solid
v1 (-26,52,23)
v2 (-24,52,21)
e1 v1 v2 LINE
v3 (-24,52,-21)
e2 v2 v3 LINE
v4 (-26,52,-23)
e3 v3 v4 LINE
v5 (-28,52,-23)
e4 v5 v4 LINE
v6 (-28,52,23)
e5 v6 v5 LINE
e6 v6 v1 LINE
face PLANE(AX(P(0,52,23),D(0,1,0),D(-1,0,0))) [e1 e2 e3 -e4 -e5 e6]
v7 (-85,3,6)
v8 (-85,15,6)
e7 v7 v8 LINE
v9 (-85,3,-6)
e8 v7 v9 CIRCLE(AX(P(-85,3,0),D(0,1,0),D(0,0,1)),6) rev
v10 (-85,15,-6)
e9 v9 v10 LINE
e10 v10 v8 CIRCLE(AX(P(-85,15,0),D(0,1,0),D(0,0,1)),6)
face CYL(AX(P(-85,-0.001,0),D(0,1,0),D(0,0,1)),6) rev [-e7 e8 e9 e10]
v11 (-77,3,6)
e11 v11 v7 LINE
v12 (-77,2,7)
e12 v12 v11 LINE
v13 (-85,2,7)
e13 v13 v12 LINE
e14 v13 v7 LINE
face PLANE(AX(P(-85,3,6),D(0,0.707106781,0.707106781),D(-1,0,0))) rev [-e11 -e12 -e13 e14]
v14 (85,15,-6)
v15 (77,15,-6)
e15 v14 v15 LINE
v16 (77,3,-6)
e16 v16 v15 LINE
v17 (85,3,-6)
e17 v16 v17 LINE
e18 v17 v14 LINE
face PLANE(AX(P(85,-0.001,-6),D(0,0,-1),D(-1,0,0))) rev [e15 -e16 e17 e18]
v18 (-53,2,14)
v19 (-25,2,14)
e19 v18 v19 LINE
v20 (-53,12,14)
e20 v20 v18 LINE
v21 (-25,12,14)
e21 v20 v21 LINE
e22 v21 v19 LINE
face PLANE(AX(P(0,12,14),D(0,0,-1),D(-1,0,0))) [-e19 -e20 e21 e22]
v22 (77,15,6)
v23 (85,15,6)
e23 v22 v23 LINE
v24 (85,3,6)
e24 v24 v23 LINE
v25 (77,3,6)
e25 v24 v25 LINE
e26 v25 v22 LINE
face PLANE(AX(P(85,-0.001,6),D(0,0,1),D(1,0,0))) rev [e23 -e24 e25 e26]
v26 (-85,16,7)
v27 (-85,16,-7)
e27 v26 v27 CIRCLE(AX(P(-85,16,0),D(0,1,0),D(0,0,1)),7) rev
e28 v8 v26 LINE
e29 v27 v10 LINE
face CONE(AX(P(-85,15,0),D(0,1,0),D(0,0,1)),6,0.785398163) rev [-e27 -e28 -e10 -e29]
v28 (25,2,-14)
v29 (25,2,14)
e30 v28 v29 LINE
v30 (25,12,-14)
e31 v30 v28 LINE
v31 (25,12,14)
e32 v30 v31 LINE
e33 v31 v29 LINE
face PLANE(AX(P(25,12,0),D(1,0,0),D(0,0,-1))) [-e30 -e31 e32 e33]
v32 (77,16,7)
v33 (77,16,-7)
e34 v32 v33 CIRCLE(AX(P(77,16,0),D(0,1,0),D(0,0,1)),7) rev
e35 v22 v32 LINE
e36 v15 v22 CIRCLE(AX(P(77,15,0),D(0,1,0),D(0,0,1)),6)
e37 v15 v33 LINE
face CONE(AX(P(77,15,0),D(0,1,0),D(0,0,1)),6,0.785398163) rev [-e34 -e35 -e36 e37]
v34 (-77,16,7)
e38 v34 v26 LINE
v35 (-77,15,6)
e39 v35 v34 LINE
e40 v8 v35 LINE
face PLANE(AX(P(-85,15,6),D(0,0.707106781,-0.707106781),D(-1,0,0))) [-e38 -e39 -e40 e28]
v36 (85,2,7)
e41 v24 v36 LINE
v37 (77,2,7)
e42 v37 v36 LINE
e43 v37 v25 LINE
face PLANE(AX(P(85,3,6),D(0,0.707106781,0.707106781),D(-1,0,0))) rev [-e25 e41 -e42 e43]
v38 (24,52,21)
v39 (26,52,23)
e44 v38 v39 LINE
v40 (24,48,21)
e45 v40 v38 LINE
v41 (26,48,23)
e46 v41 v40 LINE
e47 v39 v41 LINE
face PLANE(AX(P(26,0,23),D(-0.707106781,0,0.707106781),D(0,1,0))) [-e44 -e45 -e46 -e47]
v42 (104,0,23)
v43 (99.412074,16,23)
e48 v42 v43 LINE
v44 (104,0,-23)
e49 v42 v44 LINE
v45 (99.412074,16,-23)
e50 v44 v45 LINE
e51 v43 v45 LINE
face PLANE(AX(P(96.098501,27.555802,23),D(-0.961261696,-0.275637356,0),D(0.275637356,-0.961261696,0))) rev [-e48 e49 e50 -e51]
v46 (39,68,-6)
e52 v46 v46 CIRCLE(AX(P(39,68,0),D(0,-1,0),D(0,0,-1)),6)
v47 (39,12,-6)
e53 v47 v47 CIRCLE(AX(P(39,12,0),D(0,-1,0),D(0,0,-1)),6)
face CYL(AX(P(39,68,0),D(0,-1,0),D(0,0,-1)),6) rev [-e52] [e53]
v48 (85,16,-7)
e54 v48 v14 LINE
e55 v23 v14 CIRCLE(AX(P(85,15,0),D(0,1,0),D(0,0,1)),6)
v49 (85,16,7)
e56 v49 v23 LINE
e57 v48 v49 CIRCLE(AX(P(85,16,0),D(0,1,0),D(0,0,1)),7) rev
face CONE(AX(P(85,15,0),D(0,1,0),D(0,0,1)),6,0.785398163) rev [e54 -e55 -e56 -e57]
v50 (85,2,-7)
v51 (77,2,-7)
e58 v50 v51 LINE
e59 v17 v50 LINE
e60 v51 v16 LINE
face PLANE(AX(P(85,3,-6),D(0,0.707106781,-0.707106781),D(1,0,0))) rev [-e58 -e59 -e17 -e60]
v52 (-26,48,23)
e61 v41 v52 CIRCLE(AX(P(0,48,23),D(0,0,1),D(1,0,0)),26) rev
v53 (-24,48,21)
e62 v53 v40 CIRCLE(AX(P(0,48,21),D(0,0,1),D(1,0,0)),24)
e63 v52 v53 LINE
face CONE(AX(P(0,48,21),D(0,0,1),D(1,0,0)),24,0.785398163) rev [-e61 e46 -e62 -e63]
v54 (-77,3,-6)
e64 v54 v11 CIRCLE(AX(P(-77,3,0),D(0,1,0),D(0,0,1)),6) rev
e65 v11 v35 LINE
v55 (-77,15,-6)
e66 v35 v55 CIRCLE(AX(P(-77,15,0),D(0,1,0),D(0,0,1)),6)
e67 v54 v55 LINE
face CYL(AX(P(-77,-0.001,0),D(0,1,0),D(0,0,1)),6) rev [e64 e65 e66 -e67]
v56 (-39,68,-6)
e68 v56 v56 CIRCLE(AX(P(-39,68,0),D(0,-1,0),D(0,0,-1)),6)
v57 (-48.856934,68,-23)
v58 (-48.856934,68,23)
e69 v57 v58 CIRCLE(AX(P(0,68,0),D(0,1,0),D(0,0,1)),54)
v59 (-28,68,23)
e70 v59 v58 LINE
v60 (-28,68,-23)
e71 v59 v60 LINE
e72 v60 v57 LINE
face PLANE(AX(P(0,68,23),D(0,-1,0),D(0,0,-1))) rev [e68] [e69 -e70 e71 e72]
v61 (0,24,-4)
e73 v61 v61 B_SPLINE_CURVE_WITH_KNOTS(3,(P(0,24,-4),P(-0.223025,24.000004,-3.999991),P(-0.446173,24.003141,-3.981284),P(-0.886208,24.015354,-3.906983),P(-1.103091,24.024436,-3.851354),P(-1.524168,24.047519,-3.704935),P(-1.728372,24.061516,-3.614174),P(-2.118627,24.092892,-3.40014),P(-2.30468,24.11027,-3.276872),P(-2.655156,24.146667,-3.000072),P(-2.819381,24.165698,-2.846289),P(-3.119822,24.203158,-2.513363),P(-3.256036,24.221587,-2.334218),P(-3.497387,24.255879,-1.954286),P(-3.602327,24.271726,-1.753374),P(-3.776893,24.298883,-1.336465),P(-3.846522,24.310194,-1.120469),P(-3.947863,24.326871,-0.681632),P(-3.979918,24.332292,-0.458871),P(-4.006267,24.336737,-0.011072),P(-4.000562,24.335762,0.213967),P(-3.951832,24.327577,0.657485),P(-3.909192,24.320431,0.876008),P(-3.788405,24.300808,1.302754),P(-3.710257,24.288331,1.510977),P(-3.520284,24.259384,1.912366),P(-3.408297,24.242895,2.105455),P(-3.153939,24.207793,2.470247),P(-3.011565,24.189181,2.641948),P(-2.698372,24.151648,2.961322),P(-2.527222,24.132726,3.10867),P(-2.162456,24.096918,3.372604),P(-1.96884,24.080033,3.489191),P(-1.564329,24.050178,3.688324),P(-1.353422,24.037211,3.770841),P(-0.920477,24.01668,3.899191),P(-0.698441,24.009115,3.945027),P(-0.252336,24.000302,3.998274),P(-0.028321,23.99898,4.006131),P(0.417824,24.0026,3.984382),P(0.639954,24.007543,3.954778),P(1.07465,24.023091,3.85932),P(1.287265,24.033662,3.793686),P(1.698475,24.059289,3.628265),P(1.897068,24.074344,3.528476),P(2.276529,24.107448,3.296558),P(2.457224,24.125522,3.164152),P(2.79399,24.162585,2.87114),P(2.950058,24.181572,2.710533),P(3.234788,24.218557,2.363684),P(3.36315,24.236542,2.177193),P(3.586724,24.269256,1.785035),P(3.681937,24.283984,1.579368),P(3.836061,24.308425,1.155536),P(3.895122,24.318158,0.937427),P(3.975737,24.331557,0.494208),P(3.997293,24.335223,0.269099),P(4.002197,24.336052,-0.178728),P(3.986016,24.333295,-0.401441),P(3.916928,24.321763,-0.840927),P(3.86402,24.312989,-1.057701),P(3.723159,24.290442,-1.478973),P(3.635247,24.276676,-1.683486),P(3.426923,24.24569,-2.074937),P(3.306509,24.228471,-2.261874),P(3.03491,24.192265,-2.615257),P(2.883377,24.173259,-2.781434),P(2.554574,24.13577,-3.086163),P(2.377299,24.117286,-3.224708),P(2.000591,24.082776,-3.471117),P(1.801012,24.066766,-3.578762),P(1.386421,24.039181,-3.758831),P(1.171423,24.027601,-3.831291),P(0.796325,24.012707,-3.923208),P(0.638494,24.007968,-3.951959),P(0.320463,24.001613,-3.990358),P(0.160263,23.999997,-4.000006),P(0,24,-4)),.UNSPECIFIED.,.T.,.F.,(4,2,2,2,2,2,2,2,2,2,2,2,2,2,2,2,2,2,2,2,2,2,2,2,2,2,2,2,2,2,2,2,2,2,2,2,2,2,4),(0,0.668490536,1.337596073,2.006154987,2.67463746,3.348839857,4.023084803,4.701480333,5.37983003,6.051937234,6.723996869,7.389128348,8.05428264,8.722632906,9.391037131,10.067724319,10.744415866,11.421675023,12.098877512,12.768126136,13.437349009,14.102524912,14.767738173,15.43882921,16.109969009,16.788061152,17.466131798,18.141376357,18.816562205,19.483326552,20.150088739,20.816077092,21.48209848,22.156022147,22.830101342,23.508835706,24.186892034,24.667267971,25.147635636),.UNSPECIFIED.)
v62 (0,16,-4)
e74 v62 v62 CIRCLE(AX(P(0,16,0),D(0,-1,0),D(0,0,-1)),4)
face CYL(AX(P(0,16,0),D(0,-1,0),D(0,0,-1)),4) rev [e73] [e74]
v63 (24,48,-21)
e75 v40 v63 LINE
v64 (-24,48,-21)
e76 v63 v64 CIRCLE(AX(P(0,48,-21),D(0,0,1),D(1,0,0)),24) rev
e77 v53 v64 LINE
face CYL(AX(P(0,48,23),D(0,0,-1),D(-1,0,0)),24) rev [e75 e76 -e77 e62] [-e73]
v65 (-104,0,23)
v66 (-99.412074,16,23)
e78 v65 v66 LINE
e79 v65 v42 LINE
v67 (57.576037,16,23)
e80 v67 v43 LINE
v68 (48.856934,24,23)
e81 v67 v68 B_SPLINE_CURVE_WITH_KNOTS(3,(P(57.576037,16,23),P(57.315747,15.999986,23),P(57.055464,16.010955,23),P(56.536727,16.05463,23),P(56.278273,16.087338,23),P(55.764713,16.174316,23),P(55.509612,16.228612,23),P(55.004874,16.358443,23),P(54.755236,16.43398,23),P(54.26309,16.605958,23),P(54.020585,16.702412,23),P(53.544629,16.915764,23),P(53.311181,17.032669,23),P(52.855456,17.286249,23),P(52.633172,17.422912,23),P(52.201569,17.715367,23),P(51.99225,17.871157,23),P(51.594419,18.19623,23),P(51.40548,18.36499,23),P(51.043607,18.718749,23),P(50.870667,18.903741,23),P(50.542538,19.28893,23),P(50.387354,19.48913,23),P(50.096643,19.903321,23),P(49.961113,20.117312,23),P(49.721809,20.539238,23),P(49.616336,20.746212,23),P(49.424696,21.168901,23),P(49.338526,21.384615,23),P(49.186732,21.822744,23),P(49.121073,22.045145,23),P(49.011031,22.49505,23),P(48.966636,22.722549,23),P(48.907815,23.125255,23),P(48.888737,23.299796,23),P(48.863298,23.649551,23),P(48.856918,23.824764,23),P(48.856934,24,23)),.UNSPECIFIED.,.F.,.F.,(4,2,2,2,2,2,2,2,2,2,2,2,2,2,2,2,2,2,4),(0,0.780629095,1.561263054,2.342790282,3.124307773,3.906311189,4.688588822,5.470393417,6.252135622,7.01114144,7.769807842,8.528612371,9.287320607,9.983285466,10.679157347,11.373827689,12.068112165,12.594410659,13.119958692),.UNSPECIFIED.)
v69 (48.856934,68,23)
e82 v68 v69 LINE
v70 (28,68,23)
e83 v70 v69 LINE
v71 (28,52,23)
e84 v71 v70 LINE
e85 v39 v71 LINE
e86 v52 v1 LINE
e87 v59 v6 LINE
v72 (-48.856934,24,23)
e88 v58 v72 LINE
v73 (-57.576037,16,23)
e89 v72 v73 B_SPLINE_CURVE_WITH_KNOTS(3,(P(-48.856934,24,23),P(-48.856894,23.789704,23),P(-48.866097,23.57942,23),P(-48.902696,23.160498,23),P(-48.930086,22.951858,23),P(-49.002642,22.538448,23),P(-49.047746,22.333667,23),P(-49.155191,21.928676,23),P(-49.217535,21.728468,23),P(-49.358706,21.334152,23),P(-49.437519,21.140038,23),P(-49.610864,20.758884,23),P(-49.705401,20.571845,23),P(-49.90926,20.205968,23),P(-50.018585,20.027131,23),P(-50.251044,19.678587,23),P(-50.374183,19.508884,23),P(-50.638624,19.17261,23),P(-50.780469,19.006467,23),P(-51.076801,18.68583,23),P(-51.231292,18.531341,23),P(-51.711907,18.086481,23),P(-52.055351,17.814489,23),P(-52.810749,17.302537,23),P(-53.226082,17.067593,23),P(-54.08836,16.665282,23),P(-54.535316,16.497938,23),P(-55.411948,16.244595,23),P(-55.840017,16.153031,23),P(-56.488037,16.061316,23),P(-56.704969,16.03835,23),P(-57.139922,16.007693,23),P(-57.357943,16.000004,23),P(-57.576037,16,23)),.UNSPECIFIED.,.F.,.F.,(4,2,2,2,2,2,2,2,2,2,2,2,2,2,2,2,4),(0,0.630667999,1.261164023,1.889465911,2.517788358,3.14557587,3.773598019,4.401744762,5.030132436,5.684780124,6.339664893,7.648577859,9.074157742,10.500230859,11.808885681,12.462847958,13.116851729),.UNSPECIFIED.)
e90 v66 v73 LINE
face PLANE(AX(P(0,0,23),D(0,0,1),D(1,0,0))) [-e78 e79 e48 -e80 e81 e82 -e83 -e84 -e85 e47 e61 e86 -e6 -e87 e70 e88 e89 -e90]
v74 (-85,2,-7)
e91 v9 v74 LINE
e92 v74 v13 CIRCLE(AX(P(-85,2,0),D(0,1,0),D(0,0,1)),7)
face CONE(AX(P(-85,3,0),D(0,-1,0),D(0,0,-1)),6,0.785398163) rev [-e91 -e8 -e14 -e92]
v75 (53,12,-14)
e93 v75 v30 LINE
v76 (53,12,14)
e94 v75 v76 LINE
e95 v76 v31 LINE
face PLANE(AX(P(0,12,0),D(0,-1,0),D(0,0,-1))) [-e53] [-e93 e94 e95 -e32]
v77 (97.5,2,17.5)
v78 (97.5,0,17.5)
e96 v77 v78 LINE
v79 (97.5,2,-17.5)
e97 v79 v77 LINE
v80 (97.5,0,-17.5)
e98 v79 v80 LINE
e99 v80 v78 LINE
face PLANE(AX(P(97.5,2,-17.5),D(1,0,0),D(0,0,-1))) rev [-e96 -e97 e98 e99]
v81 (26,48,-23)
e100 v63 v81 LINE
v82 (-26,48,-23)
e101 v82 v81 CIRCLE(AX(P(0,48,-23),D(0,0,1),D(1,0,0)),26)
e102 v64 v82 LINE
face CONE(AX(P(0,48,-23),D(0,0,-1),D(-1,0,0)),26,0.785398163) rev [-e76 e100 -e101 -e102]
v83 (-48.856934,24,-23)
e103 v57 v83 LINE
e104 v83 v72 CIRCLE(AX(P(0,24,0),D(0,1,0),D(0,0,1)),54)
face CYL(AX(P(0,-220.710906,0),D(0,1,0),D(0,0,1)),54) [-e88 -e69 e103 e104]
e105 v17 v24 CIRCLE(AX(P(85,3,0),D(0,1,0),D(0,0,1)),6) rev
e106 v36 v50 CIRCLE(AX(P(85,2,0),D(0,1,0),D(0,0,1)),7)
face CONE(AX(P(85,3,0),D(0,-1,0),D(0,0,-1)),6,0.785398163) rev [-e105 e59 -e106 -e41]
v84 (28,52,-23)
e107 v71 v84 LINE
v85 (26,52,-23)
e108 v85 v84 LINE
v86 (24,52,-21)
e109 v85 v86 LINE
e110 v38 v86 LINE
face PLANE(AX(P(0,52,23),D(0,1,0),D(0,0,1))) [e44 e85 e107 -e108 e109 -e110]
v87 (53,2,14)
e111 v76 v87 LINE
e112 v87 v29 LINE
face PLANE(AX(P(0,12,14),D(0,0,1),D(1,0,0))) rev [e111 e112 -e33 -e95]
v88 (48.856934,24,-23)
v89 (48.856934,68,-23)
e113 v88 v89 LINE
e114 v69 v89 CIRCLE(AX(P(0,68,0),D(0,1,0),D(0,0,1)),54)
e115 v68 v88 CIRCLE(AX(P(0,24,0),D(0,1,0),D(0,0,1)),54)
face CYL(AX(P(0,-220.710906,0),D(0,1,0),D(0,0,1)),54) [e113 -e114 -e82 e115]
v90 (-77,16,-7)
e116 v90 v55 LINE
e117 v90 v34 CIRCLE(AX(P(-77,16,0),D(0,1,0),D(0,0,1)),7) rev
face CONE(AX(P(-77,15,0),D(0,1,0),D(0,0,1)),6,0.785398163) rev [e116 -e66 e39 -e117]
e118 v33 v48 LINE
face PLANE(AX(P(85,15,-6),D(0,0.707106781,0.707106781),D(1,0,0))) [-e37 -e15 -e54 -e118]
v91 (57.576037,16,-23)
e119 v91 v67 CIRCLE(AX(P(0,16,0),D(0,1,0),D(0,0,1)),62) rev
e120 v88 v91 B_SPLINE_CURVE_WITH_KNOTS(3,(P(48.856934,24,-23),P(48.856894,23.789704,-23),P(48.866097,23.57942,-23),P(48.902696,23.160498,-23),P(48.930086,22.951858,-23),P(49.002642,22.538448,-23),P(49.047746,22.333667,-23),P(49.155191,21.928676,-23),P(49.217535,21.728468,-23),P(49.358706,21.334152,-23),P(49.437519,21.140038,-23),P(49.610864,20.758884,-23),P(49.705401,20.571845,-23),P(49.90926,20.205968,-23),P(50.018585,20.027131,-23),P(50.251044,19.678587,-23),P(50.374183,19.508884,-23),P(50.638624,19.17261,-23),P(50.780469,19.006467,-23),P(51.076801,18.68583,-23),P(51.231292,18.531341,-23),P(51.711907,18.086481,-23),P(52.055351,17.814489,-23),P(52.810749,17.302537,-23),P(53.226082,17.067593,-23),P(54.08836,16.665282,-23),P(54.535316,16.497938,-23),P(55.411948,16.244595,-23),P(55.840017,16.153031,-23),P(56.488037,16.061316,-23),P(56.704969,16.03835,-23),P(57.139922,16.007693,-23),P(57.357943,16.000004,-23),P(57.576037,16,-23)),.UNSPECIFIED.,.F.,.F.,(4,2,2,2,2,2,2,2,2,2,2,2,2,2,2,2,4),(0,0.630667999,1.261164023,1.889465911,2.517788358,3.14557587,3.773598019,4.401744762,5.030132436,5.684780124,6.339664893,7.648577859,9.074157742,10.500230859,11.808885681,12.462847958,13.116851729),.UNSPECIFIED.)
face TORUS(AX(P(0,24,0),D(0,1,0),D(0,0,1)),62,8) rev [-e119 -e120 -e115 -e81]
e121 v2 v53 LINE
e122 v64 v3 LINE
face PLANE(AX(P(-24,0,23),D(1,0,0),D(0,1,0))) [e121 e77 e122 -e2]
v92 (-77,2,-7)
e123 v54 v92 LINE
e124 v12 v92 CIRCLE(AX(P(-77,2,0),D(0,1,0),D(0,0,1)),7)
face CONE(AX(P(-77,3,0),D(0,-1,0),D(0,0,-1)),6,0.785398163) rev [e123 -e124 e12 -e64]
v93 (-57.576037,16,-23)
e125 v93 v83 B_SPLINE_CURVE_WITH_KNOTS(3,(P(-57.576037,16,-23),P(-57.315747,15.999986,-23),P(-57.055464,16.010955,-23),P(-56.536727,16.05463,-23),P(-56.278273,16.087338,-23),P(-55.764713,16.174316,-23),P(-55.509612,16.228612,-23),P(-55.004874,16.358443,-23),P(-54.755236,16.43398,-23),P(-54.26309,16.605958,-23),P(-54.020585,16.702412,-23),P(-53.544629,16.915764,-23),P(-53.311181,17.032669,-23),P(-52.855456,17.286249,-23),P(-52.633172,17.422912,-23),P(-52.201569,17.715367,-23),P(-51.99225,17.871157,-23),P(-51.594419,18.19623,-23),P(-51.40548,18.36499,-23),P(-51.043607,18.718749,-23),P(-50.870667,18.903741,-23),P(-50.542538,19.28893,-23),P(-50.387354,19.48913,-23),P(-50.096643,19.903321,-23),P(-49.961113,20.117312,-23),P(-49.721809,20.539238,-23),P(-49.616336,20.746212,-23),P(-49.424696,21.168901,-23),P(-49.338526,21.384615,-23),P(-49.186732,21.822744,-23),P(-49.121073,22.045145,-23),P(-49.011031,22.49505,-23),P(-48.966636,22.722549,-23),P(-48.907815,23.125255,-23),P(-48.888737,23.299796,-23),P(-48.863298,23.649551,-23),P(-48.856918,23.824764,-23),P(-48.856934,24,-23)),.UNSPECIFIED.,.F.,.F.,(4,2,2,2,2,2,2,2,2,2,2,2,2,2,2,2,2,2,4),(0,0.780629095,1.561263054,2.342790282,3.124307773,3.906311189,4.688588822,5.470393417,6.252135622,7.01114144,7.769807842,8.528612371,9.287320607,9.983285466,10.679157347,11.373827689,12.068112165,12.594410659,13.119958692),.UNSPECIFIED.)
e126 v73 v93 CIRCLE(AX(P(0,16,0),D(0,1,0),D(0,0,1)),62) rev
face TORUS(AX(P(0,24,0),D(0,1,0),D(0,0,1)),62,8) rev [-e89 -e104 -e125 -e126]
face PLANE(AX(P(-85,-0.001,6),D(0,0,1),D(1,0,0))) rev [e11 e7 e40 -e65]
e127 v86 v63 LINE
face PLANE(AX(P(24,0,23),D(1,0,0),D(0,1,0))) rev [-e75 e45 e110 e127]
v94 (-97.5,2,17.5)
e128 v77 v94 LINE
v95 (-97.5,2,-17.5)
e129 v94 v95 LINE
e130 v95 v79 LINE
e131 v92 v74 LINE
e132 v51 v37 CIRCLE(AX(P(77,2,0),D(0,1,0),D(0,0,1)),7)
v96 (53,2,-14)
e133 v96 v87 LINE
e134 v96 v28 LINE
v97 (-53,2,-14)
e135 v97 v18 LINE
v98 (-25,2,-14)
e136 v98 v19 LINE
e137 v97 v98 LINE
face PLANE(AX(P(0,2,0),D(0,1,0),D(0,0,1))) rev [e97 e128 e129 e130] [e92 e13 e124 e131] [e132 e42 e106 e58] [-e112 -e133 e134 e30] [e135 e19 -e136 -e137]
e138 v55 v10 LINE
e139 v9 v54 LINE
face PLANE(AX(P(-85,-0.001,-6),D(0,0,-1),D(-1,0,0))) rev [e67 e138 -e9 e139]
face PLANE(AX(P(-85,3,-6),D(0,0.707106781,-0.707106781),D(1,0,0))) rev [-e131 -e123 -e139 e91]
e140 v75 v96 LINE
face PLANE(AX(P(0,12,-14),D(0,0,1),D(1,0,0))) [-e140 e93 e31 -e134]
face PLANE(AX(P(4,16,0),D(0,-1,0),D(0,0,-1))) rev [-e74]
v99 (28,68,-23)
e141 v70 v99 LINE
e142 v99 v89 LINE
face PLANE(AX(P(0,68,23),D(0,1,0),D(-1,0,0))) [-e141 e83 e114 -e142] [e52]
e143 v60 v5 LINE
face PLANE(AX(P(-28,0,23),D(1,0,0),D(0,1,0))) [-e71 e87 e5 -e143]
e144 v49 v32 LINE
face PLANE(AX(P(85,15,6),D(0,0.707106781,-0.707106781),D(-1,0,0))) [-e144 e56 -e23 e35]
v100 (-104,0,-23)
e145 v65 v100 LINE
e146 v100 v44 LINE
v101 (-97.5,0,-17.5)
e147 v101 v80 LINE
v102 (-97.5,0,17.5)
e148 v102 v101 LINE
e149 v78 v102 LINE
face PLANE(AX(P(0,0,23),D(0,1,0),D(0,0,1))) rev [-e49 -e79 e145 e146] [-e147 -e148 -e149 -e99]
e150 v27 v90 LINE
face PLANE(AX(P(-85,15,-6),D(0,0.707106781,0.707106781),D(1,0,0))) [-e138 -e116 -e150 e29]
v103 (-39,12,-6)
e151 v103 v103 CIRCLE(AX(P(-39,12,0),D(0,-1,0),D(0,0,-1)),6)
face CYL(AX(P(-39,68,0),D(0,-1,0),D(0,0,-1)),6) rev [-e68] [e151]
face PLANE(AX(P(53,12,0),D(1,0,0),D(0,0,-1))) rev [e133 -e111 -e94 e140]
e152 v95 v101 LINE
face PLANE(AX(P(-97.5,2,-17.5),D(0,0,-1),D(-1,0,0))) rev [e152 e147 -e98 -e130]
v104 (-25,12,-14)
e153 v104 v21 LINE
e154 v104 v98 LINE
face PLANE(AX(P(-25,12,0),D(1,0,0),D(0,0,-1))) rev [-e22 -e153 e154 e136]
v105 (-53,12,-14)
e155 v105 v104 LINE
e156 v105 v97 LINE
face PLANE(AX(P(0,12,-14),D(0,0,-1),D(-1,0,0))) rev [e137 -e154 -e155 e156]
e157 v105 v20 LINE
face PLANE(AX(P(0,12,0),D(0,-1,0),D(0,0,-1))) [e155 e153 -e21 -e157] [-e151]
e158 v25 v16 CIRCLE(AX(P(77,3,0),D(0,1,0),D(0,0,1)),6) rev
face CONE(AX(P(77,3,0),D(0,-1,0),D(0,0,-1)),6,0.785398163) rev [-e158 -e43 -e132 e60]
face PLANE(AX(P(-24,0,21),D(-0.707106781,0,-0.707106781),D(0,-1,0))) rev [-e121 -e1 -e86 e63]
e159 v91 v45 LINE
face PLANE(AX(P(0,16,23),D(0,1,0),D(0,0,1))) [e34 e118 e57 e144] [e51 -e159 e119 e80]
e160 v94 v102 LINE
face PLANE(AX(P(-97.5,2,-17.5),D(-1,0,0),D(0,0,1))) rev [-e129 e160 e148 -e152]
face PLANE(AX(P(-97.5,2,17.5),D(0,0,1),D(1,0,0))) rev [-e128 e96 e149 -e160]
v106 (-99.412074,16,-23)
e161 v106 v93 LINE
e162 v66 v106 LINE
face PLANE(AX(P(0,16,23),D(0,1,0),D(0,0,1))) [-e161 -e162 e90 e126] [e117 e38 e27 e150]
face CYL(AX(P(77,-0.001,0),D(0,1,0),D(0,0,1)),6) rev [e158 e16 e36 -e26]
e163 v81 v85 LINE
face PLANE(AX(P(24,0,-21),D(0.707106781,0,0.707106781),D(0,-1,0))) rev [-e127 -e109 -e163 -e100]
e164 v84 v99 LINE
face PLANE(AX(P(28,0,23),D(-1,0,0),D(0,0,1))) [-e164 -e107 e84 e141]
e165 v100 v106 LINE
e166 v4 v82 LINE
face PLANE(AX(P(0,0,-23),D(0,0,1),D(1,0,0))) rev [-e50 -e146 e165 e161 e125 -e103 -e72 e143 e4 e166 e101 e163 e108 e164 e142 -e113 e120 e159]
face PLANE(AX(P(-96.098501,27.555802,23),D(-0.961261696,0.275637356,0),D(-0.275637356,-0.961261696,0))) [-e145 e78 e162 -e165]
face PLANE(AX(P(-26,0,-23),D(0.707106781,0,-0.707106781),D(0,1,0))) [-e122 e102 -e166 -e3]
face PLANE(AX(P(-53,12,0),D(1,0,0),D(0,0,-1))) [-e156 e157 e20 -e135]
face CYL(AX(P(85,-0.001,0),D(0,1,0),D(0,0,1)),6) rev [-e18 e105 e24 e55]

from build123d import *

# Parameters (mm, degrees)
BOSS_EXTRUDE1_DEPTH = 23
CUT_EXTRUDE1_START  = -52
CUT_EXTRUDE1_DEPTH  = 52
SKETCH3_W           = 195
SKETCH3_H           = 35
CUT_EXTRUDE2_DEPTH  = 2
FILLET1_R           = 8
CUT_EXTRUDE3_REACH  = 120.528
CHAMFER1_SIZE       = 1
SKETCH16_W          = 28
SKETCH16_H          = 28
SKETCH16_R          = 6
CUT_EXTRUDE4_DEPTH  = 10
SKETCH16_3_R        = 6
CUT_EXTRUDE5_DEPTH  = 126.303631386
CHAMFER2_SIZE       = 2
SKETCH20_W          = 4
SKETCH20_H          = 9


# Read off the part's stored shape, not the designer's step: Cut-Extrude1
with BuildPart() as part:
    # Sketch1 → Boss-Extrude1 (new, symmetric)
    with BuildSketch(Plane.XY):
        Polygon((-104, 0), (104, 0), (99.412073828, 16), (-99.412073828, 16), align=None)
        with BuildLine():
            Line((-54, 68), (-54, 16))
            Line((-54, 16), (54, 16))
            Line((54, 16), (54, 68))
            Line((54, 68), (28, 68))
            Line((28, 68), (28, 52))
            Line((28, 52), (24, 52))
            Line((24, 52), (24, 48))
            ThreePointArc((24, 48), (0, 24), (-24, 48))
            Line((-24, 48), (-24, 52))
            Line((-24, 52), (-28, 52))
            Line((-28, 52), (-28, 68))
            Line((-28, 68), (-54, 68))
        make_face()
    extrude(amount=BOSS_EXTRUDE1_DEPTH, both=True)

    # Cut-Extrude1 outline → Cut-Extrude1 (cut)
    with BuildSketch(Plane(origin=(0, 68, 0), x_dir=(1, 0, 0), z_dir=(0, 1, 0)).offset(CUT_EXTRUDE1_START)):
        with BuildLine():
            ThreePointArc((-54, 0), (-52.698550436, 11.784005345), (-48.856934001, 23))
            Line((-48.856934001, 23), (-54, 23))
            Line((-54, 23), (-54, 0))
        make_face()
        with BuildLine():
            ThreePointArc((-48.856934001, -23), (-52.698550436, -11.784005345), (-54, 0))
            Line((-54, 0), (-54, -23))
            Line((-54, -23), (-48.856934001, -23))
        make_face()
        with BuildLine():
            Line((54, 23), (48.856934001, 23))
            ThreePointArc((48.856934001, 23), (52.698550436, 11.784005345), (54, 0))
            Line((54, 0), (54, 23))
        make_face()
        with BuildLine():
            Line((54, -23), (54, 0))
            ThreePointArc((54, 0), (52.698550436, -11.784005345), (48.856934001, -23))
            Line((48.856934001, -23), (54, -23))
        make_face()
    extrude(amount=CUT_EXTRUDE1_DEPTH, mode=Mode.SUBTRACT)

    # Sketch3 → Cut-Extrude2 (cut)
    with BuildSketch(Plane.XZ):
        Rectangle(SKETCH3_W, SKETCH3_H)
    extrude(amount=-CUT_EXTRUDE2_DEPTH, mode=Mode.SUBTRACT)

    # Fillet1
    fillet1_edges = [part.edges().sort_by_distance(p)[0] for p in [
        (52.698550436, 16, -11.784005345),
        (-52.698550436, 16, -11.784005345),
    ]]
    fillet(fillet1_edges, radius=FILLET1_R)

    # Sketch4 → Cut-Extrude3 (cut, up to next)
    with BuildSketch(Plane(origin=(0, 16, 0), x_dir=(1, 0, 0), z_dir=(0, 1, 0)), mode=Mode.PRIVATE) as cut_extrude3_sk1:
        with BuildLine():
            Line((-85, 6), (-77, 6))
            ThreePointArc((-77, 6), (-71, 0), (-77, -6))
            Line((-77, -6), (-85, -6))
            ThreePointArc((-85, -6), (-91, 0), (-85, 6))
        make_face()
    cut_extrude3_tool1 = extrude(cut_extrude3_sk1.sketch, amount=-CUT_EXTRUDE3_REACH, mode=Mode.PRIVATE) & part.part
    # Sketch4 → Cut-Extrude3 (cut, up to next)
    with BuildSketch(Plane(origin=(0, 16, 0), x_dir=(1, 0, 0), z_dir=(0, 1, 0)), mode=Mode.PRIVATE) as cut_extrude3_sk2:
        with BuildLine():
            Line((85, 6), (77, 6))
            ThreePointArc((77, 6), (71, 0), (77, -6))
            Line((77, -6), (85, -6))
            ThreePointArc((85, -6), (91, 0), (85, 6))
        make_face()
    cut_extrude3_tool2 = extrude(cut_extrude3_sk2.sketch, amount=-CUT_EXTRUDE3_REACH, mode=Mode.PRIVATE) & part.part
    add(cut_extrude3_tool1.solids().sort_by_distance((-81, 16, 0))[0], mode=Mode.SUBTRACT)
    add(cut_extrude3_tool2.solids().sort_by_distance((81, 16, 0))[0], mode=Mode.SUBTRACT)

    # Chamfer1
    chamfer1_edges = [part.edges().sort_by_distance(p)[0] for p in [
        (-91, 16, 0),
        (-81, 16, 6),
        (-71, 16, 0),
        (-81, 16, -6),
        (-81, 2, 6),
        (-91, 2, 0),
        (-81, 2, -6),
        (-71, 2, 0),
        (91, 16, 0),
        (81, 16, -6),
        (71, 16, 0),
        (81, 16, 6),
        (81, 2, -6),
        (91, 2, 0),
        (81, 2, 6),
        (71, 2, 0),
    ]]
    chamfer(chamfer1_edges, length=CHAMFER1_SIZE)

    # Sketch16 → Cut-Extrude4 (cut)
    # profile 1 of 2: a face of its own
    with BuildSketch(Plane.XZ.offset(-2)):
        with Locations((-39, 0)):
            Rectangle(SKETCH16_W, SKETCH16_H)
        with Locations(Location((-39, 0, 0), (0, 0, 270))):
            Circle(SKETCH16_R, mode=Mode.SUBTRACT)
    # profile 2 of 2: a face of its own
    with BuildSketch(Plane.XZ.offset(-2)):
        with Locations((39, 0)):
            Rectangle(SKETCH16_W, SKETCH16_H)
        with Locations(Location((39, 0, 0), (0, 0, 270))):
            Circle(SKETCH16_R, mode=Mode.SUBTRACT)
    extrude(amount=-CUT_EXTRUDE4_DEPTH, mode=Mode.SUBTRACT)

    # Sketch16<3> → Cut-Extrude5 (cut, through all)
    with BuildSketch(Plane.XZ.offset(-2)):
        with Locations(Location((-39, 0, 0), (0, 0, 270))):
            Circle(SKETCH16_3_R)
        with Locations(Location((39, 0, 0), (0, 0, 270))):
            Circle(SKETCH16_3_R)
    extrude(amount=-CUT_EXTRUDE5_DEPTH, mode=Mode.SUBTRACT)

    # Chamfer2
    chamfer2_edges = [part.edges().sort_by_distance(p)[0] for p in [
        (-24, 50, -23),
        (0, 24, -23),
        (24, 50, -23),
        (24, 50, 23),
        (0, 24, 23),
        (-24, 50, 23),
    ]]
    chamfer(chamfer2_edges, length=CHAMFER2_SIZE)

    # Sketch20 → Ø8.0mm Dowel Hole5 (revolve, cut)
    with BuildSketch(Plane(origin=(0, 16, 0), x_dir=(0, 0, -1), z_dir=(1, 0, 0))):
        with Locations((2, 4.5)):
            Rectangle(SKETCH20_W, SKETCH20_H)
    revolve(axis=Axis((0, 9.65, 0), (0, 1, 0)), mode=Mode.SUBTRACT)


solid = part.part
